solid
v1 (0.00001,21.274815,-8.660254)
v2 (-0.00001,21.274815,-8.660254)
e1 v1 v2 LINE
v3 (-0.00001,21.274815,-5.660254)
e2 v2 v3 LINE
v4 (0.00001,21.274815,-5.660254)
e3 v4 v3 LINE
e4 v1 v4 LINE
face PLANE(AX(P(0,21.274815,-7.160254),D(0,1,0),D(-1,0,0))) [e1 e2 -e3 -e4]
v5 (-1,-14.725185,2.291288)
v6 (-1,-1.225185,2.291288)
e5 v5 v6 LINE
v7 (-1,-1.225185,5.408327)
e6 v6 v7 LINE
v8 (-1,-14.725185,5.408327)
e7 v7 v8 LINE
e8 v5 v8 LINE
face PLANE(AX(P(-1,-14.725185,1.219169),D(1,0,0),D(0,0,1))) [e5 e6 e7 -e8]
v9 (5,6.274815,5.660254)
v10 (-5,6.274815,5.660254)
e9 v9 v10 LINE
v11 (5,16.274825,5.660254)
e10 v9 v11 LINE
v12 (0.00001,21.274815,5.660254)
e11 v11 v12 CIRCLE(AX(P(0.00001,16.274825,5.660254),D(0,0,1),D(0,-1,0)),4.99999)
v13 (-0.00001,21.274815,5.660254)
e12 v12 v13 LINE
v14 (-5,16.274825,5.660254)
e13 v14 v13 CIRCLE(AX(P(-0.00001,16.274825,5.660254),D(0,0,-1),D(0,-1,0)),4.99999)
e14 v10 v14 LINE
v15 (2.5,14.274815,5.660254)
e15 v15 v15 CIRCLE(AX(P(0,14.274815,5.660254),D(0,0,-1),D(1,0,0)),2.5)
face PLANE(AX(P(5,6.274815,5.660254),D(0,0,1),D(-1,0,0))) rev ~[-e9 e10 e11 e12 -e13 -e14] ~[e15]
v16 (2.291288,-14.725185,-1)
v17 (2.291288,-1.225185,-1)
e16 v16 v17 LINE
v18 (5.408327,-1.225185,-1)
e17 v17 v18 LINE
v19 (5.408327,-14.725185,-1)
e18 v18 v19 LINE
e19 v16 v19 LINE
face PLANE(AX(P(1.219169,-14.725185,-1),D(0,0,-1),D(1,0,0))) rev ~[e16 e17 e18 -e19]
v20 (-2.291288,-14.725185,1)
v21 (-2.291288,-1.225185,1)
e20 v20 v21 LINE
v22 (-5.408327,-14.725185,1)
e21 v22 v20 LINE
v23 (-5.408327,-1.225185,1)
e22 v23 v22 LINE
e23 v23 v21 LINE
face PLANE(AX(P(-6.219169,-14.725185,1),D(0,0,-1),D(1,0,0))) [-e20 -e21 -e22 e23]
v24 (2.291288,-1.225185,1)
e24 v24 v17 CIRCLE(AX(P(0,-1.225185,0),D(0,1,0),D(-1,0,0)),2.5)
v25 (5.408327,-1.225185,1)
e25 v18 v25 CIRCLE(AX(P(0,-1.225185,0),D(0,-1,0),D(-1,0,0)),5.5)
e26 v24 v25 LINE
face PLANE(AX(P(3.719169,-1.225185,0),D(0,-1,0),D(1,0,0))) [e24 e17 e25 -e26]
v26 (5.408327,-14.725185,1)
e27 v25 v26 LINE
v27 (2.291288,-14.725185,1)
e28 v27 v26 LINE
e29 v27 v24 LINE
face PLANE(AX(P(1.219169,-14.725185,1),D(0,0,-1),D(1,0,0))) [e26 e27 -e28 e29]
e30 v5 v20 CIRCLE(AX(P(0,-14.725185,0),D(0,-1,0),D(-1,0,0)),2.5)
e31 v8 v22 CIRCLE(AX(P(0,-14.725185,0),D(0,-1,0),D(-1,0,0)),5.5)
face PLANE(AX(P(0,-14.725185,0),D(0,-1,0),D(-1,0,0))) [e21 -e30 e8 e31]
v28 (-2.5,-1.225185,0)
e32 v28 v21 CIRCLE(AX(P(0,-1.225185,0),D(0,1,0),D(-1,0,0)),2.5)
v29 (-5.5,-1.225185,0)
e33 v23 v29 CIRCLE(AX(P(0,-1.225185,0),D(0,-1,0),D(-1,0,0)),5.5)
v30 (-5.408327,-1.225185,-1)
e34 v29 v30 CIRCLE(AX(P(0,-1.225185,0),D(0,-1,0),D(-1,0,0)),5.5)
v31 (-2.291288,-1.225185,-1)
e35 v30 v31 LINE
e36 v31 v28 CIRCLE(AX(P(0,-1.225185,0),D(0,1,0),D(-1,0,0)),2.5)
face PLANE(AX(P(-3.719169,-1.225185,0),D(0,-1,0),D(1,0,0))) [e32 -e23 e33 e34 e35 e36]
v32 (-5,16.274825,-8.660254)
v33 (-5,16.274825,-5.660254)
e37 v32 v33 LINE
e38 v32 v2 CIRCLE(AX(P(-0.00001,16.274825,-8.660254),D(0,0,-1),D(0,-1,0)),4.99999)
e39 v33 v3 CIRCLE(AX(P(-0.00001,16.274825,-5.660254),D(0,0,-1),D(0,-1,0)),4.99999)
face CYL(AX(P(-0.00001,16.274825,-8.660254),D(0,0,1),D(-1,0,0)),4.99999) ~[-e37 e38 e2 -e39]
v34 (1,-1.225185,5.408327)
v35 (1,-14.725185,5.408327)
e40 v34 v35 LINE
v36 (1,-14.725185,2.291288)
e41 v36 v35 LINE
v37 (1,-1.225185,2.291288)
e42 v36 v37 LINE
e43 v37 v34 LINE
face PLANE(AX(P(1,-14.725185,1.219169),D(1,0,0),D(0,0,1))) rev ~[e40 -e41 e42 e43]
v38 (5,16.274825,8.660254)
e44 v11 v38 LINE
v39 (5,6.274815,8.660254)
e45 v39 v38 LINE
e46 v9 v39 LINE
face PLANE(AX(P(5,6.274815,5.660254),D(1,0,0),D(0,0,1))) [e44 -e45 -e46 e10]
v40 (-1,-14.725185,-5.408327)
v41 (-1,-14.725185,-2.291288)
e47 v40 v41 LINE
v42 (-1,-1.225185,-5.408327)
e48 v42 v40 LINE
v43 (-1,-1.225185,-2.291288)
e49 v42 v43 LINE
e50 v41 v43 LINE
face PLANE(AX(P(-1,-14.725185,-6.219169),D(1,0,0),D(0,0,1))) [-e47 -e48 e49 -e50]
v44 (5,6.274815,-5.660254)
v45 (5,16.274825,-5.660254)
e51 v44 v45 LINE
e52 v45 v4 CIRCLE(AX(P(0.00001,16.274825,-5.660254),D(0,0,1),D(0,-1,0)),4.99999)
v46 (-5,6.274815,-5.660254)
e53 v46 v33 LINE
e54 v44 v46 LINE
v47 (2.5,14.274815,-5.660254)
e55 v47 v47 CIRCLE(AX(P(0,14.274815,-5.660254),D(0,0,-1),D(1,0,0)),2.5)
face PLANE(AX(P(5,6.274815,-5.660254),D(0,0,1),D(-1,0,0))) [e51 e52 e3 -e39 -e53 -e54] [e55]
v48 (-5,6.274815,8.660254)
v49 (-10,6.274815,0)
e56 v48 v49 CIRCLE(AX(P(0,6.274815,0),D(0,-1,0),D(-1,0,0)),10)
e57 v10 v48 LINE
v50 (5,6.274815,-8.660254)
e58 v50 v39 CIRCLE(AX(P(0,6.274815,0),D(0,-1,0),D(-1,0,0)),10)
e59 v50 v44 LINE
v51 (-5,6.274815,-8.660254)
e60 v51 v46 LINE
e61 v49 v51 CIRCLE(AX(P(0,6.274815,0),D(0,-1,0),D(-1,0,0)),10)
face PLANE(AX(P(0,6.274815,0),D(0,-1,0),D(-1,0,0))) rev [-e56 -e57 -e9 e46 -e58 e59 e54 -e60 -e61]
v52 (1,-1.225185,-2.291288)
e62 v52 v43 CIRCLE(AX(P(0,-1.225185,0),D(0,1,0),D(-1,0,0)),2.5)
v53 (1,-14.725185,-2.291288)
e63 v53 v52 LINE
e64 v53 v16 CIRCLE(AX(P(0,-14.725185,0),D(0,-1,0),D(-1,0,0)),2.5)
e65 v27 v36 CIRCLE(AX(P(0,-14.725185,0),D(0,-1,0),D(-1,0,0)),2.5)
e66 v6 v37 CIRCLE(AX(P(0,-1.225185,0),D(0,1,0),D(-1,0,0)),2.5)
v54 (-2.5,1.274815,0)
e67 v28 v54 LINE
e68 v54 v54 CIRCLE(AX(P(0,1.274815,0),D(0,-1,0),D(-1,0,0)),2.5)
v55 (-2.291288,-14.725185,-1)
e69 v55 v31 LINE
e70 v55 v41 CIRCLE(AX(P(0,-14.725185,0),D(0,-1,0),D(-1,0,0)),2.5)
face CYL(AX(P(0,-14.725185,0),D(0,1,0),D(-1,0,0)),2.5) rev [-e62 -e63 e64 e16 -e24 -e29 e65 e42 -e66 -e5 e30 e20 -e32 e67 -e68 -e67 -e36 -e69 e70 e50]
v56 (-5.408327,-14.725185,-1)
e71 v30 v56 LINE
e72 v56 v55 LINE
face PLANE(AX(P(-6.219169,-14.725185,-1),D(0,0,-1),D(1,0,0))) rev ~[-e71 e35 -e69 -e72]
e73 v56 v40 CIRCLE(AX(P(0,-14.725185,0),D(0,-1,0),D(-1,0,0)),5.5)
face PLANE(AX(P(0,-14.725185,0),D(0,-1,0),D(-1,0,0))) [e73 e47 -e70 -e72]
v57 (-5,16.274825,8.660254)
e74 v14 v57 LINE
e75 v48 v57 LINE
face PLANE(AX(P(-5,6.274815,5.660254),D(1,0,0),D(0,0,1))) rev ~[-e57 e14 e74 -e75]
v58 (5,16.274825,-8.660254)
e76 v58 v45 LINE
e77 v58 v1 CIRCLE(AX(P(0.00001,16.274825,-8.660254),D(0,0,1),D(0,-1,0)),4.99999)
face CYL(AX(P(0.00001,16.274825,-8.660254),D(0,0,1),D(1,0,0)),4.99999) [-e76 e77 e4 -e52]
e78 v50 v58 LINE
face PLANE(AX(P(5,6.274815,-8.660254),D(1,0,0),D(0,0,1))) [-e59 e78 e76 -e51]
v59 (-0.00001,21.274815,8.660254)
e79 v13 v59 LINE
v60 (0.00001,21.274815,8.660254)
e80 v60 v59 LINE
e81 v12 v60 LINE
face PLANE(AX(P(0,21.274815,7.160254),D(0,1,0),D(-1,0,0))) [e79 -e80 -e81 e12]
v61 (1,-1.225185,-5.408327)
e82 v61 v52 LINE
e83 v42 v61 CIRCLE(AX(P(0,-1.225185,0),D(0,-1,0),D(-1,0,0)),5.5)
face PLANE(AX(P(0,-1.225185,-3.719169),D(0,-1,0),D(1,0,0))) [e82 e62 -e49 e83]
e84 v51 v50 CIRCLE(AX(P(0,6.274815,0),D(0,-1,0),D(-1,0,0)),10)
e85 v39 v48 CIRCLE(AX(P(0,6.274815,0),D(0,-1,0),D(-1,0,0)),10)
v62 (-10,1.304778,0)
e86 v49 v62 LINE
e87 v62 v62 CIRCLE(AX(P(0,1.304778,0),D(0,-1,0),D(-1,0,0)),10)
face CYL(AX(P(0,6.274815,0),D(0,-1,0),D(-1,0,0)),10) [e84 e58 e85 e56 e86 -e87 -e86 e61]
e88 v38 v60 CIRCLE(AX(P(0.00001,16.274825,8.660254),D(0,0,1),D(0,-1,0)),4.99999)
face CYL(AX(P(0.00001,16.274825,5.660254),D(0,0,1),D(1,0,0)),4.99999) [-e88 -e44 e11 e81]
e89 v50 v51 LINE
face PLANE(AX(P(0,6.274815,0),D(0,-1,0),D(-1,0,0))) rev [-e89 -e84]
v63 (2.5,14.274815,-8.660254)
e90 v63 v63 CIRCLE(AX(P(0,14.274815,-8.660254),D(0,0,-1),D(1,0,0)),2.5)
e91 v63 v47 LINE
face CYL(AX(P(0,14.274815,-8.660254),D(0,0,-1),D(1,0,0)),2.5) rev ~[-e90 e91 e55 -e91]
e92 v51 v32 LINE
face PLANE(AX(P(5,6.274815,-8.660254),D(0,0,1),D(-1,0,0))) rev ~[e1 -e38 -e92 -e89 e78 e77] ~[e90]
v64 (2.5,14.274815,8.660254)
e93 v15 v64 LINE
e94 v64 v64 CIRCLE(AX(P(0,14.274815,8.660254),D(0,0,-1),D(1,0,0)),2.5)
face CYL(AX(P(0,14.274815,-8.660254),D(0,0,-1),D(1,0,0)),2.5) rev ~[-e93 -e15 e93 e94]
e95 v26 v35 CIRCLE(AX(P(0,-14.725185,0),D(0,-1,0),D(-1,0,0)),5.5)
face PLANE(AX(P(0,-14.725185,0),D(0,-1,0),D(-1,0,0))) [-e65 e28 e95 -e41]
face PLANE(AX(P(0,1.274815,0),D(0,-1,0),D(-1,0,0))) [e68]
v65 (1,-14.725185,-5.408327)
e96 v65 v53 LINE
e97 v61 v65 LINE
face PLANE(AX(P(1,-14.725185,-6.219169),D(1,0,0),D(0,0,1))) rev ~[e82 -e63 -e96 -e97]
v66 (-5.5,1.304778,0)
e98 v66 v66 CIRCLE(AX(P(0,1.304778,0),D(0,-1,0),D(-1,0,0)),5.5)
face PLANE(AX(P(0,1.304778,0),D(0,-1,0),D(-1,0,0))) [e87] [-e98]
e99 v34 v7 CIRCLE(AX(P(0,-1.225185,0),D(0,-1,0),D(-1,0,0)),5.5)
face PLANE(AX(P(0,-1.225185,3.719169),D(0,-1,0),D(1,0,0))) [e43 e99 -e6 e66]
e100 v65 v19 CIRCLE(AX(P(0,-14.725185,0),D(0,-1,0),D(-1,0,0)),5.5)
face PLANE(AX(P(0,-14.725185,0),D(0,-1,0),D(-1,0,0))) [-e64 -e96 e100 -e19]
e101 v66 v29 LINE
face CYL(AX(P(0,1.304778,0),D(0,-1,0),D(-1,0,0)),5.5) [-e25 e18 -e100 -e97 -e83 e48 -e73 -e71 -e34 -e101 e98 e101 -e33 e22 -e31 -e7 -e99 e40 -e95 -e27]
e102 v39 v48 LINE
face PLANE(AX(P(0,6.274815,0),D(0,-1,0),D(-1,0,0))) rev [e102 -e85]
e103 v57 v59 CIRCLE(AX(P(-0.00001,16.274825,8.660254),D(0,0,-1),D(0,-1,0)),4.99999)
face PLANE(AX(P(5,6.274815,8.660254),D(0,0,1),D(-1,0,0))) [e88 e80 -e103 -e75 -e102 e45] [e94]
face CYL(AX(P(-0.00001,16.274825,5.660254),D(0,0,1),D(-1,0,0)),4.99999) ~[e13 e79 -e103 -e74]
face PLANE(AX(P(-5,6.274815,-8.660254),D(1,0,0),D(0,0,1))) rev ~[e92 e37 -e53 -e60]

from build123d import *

# Parameters (mm, degrees)
F2_W     = 10
F2_H     = 3
F3_DEPTH = 15
F4_R     = 4.99999
F5_R     = 2.5
F6_DEPTH = 18.6612540378
F7_W     = 2
F7_H     = 5
F7_W_2   = 5
F7_H_2   = 2
F8_DEPTH = 13.5


# Not quite as in the source:
# - a fillet or chamfer is up to 0.001 mm smaller than in the source, because OpenCascade refuses the exact size


with BuildPart() as f1:
    # F0 (on Top) → F1 (revolve)
    with BuildSketch(Plane.XY):
        Polygon((0, 6.2748147342), (-10, 6.2748147342), (-10, 1.304778154), (-5.5, 1.304778154), (-5.5, -14.7251852658), (-2.5, -14.7251852658), (-2.5, 1.2748147342), (0, 1.2748147342), align=None)
    revolve(axis=Axis((0, 3.7748147342, 0), (0, -1, 0)))

    # F2 (on face) → F3 (join)
    with BuildSketch(Plane(origin=(0, 6.2748147342, 0), x_dir=(-1, 0, 0), z_dir=(0, 1, 0))):
        with Locations((0, 7.1602540378)):
            Rectangle(F2_W, F2_H)
        with Locations((0, -7.1602540378)):
            Rectangle(F2_W, F2_H)
    extrude(amount=F3_DEPTH)

    # F4 (radius 5 in the source; OpenCascade refuses exactly that, so slightly less here)
    f4_edges = [f1.edges().sort_by_distance(p)[0] for p in [
        (-5, 21.274815, -7.160254),
        (5, 21.274815, -7.160254),
        (5, 21.274815, 7.160254),
        (-5, 21.274815, 7.160254),
    ]]
    fillet(f4_edges, radius=F4_R)

    # F5 (on face) → F6 (cut, through all)
    with BuildSketch(Plane(origin=(0, 0, -8.6602540378), x_dir=(1, 0, 0), z_dir=(0, 0, -1))):
        with Locations((0, -14.2748147342)):
            Circle(F5_R)
    extrude(amount=-F6_DEPTH, mode=Mode.SUBTRACT)

    # F7 (on face) → F8 (cut)
    with BuildSketch(Plane.XZ.offset(14.7251852658)):
        with Locations((0, 3.7191687186)):
            Rectangle(F7_W, F7_H)
        with Locations((-3.7191687186, 0)):
            Rectangle(F7_W_2, F7_H_2)
        with Locations((0, -3.7191687186)):
            Rectangle(F7_W, F7_H)
        with Locations((3.7191687186, 0)):
            Rectangle(F7_W_2, F7_H_2)
    extrude(amount=-F8_DEPTH, mode=Mode.SUBTRACT)


solid = f1.part
